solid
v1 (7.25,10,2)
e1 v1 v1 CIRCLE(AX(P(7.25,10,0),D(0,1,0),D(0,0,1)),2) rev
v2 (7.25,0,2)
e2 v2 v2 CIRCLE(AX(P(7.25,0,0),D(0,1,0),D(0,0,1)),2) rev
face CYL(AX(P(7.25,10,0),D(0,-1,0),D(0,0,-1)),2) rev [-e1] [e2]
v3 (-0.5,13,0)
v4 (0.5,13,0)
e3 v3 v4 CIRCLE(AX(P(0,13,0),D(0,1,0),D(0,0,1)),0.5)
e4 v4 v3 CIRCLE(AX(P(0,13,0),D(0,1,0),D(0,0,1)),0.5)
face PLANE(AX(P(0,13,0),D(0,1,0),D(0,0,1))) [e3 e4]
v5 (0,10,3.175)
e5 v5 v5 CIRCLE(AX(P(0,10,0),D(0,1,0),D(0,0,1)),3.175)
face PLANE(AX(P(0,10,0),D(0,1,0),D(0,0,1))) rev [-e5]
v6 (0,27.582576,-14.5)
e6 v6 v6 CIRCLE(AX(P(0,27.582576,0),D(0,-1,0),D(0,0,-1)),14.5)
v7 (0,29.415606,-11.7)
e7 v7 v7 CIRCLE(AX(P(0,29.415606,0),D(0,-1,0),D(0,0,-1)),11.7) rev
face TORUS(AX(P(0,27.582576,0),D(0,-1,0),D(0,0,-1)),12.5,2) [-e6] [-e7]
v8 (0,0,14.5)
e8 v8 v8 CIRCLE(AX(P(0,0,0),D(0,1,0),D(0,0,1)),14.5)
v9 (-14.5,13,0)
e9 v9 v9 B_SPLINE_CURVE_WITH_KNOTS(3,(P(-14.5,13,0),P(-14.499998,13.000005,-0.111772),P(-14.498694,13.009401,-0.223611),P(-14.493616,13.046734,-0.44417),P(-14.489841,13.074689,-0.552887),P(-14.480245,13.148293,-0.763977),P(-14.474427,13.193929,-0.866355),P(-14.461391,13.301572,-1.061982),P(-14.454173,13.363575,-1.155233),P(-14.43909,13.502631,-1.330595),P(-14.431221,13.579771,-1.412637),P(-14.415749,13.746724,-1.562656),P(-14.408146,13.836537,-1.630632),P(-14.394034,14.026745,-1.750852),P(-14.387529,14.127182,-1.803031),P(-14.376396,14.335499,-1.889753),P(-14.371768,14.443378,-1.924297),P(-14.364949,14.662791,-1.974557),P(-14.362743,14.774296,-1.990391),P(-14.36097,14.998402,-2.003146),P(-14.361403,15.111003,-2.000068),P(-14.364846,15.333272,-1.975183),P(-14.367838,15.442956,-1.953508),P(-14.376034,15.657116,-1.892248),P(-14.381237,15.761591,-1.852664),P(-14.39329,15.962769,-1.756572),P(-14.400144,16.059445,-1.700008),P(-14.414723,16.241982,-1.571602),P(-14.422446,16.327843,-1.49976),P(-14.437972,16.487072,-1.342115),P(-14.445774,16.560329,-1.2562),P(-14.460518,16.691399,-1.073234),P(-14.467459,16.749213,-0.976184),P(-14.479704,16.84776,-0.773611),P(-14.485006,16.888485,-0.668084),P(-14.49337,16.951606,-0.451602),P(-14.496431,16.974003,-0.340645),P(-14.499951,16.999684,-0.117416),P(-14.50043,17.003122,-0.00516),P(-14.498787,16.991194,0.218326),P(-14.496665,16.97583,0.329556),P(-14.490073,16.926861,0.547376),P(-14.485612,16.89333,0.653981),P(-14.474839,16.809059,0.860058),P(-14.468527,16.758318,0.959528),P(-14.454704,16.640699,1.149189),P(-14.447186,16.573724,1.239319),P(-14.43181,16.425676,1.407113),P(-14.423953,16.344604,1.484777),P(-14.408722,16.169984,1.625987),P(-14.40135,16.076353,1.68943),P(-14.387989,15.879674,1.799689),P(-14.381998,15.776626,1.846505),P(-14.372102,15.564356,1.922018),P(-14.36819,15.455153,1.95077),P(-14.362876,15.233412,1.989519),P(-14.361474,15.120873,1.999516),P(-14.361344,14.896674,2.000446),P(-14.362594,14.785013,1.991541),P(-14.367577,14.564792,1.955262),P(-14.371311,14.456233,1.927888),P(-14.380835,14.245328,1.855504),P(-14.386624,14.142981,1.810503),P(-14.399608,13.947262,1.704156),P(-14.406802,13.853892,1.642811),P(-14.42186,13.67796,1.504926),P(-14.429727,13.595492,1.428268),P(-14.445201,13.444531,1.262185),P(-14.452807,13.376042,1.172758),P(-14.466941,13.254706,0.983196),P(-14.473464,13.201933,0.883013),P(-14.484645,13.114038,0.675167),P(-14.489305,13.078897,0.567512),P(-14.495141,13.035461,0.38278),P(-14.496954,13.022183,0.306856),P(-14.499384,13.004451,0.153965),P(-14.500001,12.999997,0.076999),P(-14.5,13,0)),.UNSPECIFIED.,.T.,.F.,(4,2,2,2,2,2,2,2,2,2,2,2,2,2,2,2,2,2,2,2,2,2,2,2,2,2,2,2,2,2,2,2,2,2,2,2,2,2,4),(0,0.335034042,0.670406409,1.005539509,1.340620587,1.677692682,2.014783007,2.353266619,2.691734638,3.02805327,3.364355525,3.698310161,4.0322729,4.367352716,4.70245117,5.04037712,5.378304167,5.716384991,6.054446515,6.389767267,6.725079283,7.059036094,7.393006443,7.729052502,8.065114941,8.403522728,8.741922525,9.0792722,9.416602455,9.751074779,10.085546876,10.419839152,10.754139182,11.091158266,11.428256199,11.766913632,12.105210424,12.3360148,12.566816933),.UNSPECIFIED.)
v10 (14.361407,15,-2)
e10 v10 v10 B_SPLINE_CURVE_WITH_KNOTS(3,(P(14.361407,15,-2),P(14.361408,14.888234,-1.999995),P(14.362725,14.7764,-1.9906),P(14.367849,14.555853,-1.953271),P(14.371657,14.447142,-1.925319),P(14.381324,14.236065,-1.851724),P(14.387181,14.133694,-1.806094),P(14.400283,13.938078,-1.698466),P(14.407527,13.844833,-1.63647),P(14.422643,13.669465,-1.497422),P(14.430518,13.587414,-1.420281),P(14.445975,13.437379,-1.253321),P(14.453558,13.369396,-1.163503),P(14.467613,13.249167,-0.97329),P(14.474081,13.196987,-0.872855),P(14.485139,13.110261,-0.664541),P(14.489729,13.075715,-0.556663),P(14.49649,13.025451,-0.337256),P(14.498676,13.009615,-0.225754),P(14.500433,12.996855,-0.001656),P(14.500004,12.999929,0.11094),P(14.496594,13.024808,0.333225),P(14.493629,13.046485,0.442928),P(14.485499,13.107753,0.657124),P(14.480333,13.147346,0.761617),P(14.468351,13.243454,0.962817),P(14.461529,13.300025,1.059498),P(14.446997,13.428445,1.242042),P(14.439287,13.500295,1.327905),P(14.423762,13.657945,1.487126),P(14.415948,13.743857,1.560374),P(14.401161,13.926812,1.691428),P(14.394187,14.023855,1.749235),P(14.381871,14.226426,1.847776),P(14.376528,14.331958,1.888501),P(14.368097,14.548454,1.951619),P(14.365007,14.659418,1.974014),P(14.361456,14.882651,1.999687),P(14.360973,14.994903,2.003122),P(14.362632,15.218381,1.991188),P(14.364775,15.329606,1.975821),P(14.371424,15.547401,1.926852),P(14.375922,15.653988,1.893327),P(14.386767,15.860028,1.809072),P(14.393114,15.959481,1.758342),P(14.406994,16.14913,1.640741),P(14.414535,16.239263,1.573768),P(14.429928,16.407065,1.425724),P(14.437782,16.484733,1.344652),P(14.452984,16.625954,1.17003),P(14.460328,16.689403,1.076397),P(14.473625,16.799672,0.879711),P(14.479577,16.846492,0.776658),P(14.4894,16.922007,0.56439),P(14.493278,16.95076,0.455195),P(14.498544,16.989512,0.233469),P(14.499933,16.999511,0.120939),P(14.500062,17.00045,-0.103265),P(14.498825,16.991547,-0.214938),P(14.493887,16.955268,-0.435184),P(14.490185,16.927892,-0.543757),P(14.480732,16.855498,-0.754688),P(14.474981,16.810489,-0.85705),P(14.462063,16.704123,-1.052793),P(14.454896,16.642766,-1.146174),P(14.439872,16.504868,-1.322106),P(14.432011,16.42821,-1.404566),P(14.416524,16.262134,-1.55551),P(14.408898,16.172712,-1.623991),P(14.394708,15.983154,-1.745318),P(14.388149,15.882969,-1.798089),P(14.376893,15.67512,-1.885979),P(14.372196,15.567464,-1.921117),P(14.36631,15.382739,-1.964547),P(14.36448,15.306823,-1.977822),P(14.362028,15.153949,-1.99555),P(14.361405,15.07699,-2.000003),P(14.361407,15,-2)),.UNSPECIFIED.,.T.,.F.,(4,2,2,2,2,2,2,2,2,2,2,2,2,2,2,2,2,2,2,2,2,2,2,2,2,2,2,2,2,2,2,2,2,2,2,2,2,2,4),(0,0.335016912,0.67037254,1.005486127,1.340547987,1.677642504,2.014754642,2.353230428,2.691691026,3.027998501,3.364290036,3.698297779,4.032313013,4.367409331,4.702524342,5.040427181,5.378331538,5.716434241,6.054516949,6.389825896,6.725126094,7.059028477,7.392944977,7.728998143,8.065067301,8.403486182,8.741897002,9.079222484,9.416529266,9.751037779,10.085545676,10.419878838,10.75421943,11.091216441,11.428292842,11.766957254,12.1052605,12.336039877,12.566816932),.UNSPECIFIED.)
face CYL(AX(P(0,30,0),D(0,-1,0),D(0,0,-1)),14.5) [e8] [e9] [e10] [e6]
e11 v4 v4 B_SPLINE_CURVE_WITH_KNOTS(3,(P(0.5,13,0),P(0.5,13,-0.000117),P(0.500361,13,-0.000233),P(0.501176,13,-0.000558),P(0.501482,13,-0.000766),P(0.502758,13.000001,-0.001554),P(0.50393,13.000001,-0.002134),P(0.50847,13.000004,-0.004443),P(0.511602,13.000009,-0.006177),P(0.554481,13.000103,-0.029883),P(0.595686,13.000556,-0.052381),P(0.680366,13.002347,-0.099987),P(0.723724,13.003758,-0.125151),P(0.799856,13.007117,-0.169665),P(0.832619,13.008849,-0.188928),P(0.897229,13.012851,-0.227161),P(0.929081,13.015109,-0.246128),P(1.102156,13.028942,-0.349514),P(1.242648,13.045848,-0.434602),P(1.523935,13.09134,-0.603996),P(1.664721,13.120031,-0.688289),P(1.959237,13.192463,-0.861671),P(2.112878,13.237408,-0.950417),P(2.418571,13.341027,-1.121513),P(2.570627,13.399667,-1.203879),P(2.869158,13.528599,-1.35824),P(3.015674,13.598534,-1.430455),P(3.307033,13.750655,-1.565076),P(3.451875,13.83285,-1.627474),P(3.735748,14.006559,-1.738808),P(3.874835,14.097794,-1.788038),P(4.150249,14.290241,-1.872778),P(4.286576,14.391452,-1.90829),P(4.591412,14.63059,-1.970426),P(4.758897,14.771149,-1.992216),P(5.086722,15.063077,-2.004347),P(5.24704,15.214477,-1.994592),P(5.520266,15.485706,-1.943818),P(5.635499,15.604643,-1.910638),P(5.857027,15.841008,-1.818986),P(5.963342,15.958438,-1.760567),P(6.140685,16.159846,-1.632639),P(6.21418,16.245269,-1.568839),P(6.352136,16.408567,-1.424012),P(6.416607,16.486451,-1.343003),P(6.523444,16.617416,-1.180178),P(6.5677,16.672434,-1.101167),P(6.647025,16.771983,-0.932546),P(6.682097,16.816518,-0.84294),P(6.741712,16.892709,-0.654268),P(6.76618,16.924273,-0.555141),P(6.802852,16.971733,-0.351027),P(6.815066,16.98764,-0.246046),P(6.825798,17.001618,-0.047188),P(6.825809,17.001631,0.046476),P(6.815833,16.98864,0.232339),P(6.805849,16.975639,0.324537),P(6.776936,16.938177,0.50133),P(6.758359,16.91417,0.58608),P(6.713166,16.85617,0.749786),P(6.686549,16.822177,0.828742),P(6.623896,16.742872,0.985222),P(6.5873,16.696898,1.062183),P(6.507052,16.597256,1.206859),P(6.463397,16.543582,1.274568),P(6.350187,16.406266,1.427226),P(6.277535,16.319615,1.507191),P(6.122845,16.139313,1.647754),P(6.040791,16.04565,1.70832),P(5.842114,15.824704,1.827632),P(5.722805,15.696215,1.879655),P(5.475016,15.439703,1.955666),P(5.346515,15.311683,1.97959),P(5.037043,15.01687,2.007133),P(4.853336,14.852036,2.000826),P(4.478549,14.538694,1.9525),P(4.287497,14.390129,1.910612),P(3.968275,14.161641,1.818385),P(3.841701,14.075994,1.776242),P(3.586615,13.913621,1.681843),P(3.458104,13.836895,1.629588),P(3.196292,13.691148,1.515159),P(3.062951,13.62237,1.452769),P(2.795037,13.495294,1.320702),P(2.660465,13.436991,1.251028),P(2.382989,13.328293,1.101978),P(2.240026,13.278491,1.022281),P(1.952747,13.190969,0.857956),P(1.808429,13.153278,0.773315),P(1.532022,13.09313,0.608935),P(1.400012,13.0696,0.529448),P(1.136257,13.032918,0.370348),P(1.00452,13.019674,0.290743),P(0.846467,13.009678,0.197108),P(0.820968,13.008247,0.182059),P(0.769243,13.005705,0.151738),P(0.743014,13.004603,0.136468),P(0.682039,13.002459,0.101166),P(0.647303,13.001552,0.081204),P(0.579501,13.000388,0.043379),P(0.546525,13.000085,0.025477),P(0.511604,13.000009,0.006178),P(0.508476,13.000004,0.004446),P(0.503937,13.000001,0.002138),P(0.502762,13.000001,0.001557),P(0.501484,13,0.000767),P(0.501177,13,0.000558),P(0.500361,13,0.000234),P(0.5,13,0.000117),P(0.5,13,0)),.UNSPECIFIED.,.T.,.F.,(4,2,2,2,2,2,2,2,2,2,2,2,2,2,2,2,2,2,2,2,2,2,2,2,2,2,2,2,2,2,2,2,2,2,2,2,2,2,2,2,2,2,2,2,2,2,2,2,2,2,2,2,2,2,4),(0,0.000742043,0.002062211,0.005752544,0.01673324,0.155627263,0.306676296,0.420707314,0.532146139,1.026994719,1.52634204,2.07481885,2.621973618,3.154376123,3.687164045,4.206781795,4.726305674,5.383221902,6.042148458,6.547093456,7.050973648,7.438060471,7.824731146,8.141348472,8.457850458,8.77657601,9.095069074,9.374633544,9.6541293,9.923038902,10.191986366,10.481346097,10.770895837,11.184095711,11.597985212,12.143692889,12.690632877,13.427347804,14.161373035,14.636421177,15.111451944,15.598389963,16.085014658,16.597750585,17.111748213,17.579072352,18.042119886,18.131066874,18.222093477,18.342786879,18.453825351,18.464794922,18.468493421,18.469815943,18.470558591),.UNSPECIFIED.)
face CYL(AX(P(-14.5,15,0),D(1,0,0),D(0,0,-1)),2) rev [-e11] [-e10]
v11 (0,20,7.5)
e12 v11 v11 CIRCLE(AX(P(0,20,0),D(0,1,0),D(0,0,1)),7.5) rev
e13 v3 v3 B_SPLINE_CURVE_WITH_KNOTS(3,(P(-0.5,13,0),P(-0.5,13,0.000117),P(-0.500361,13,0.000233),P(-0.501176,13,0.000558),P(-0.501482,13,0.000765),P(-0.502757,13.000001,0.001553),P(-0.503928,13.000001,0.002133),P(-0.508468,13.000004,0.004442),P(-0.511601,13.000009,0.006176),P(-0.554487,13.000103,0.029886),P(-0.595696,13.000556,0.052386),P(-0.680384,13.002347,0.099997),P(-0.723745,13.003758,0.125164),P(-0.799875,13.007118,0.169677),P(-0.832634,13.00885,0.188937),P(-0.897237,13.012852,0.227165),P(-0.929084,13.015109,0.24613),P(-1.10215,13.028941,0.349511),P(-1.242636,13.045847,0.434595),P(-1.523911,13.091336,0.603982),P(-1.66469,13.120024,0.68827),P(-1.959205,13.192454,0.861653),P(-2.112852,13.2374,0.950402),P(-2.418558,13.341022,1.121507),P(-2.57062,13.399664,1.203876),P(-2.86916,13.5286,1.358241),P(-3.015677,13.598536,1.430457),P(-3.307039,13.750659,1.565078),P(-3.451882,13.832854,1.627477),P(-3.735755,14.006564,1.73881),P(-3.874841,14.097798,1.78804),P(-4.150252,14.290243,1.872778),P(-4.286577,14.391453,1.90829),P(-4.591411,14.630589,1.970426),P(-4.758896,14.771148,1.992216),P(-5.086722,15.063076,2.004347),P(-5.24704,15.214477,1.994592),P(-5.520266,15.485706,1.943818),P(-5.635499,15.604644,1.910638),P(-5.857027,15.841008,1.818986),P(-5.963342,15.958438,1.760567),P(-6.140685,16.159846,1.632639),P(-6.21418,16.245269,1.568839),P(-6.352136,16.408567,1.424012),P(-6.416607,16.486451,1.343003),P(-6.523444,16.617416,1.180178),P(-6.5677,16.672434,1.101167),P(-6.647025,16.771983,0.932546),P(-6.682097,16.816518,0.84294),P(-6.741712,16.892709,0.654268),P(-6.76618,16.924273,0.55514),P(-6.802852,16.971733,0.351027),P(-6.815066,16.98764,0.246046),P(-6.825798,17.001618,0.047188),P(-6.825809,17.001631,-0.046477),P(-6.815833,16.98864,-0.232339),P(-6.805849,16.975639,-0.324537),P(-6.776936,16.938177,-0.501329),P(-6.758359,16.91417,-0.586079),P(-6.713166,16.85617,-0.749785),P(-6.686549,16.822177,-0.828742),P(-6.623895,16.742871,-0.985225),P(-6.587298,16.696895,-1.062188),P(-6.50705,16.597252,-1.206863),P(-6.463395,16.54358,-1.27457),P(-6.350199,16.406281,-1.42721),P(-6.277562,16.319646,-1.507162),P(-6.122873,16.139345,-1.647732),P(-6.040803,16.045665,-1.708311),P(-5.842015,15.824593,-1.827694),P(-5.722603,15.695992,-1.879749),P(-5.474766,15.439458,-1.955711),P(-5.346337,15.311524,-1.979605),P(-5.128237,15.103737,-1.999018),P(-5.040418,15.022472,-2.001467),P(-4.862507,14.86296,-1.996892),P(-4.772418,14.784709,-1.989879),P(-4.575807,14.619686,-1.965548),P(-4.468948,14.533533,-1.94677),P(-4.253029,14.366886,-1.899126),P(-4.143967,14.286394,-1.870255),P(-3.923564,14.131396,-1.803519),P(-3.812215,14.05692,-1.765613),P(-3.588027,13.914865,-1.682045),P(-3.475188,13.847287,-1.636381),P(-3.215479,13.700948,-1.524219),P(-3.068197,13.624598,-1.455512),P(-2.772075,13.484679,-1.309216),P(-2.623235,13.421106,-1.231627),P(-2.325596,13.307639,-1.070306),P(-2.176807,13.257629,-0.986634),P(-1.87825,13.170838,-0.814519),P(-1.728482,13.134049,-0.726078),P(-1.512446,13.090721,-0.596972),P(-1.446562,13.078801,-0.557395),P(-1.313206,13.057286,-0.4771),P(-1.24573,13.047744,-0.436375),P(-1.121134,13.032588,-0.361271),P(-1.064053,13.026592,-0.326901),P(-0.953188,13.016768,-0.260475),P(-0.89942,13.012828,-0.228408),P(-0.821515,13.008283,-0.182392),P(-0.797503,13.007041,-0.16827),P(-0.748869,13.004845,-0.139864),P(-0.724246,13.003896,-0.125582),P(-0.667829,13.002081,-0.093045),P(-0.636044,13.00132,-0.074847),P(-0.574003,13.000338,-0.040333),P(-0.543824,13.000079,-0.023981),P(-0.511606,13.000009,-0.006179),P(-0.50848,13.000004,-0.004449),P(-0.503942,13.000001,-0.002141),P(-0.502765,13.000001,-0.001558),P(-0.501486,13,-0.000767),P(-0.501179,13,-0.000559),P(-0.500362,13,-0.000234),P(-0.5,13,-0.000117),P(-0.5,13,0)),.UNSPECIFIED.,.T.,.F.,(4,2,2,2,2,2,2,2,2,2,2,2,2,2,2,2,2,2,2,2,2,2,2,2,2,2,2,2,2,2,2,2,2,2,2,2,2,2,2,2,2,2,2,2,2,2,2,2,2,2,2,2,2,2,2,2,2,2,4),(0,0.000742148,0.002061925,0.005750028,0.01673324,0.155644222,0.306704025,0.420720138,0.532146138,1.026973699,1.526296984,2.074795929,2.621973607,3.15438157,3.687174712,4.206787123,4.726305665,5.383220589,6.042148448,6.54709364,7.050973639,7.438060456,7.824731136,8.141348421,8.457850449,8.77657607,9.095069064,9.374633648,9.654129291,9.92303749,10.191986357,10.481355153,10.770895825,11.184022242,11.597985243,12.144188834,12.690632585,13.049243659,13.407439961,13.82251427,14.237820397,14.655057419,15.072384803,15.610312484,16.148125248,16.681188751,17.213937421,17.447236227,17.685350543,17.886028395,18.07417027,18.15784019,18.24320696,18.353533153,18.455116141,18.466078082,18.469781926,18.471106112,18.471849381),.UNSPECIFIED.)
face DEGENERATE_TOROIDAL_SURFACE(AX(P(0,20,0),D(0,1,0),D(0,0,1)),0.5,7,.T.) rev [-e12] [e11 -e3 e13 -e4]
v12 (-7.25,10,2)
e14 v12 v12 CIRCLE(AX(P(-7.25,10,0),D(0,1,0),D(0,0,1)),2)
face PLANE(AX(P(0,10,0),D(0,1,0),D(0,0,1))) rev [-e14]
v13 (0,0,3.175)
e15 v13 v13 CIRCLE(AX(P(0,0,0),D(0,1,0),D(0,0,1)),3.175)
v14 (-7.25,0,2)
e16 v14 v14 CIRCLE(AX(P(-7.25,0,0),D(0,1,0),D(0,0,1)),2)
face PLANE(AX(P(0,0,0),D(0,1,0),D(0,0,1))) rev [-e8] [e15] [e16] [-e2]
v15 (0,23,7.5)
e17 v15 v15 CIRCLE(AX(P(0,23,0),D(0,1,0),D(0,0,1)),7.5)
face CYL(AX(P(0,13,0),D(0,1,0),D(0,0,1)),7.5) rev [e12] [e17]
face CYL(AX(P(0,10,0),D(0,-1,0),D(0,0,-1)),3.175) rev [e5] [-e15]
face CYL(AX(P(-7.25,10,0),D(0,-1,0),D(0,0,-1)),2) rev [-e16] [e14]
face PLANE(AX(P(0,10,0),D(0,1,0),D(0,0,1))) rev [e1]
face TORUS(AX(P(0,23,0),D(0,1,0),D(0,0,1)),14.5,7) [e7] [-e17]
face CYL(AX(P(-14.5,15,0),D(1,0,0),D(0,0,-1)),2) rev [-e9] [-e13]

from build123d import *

# Parameters (mm, degrees)
ESBO_O1_R                  = 14.5
RESSALTO_EXTRUS_O1_DEPTH   = 30
ESBO_O3_R                  = 7.5
CORTE_EXTRUS_O3_DEPTH      = 17
FILETE1_R                  = 7
FILETE2_R                  = 2
CORTE_EXTRUS_O1_DEPTH      = 36.994872408
CORTE_EXTRUS_O1_DEPTH_BACK = 36.994872408
ESBO_O2_R                  = 2
ESBO_O1_3_R                = 2
CORTE_EXTRUS_O2_DEPTH      = 10


with BuildPart() as part:
    # Esboço1 → Ressalto-extrusão1 (new body)
    with BuildSketch(Plane(origin=(0, 0, 0), x_dir=(1, 0, 0), z_dir=(0, 1, 0))):
        with Locations(Location((0, 0, 0), (0, 0, 270))):
            Circle(ESBO_O1_R)
    extrude(amount=RESSALTO_EXTRUS_O1_DEPTH)

    # Esboço3 → Corte-extrusão3 (cut)
    with BuildSketch(Plane(origin=(0, 30, 0), x_dir=(1, 0, 0), z_dir=(0, 1, 0))):
        with Locations(Location((0, 0, 0), (0, 0, 270))):
            Circle(ESBO_O3_R)
    extrude(amount=-CORTE_EXTRUS_O3_DEPTH, mode=Mode.SUBTRACT)

    # Filete1
    filete1_edges = [part.edges().sort_by_distance(p)[0] for p in [
        (0, 13, -7.5),
        (0, 30, -7.5),
    ]]
    fillet(filete1_edges, radius=FILETE1_R - 0.0001)  # a hair under: the kernel refuses the full size

    # Filete2
    filete2_edges = [part.edges().sort_by_distance(p)[0] for p in [
        (0, 30, -14.5),
    ]]
    fillet(filete2_edges, radius=FILETE2_R)

    # Esboço2 → Corte-extrusão1 (cut, two sides: drawn at the far end of the back side and taken through both)
    with BuildSketch(Plane(origin=(0, 0, 0), x_dir=(0, 0, -1), z_dir=(1, 0, 0)).offset(-CORTE_EXTRUS_O1_DEPTH_BACK)):
        with Locations((0, 15)):
            Circle(ESBO_O2_R)
    extrude(amount=CORTE_EXTRUS_O1_DEPTH + CORTE_EXTRUS_O1_DEPTH_BACK, mode=Mode.SUBTRACT)

    # Esboço1<3> → Corte-extrusão2 (cut)
    with BuildSketch(Plane(origin=(0, 0, 0), x_dir=(1, 0, 0), z_dir=(0, 1, 0))):
        with Locations(Location((-7.25, 0, 0), (0, 0, 270))):
            Circle(ESBO_O1_3_R)
        with BuildLine():
            ThreePointArc((3.175, 0), (2.24506403, 2.24506403), (0, 3.175))
            Line((0, 3.175), (0, -3.175))
            ThreePointArc((0, -3.175), (2.24506403, -2.24506403), (3.175, 0))
        make_face()
        with BuildLine():
            Line((0, -3.175), (0, 3.175))
            ThreePointArc((0, 3.175), (-3.175, 0), (0, -3.175))
        make_face()
        with Locations(Location((7.25, 0, 0), (0, 0, 270))):
            Circle(ESBO_O1_3_R)
    extrude(amount=CORTE_EXTRUS_O2_DEPTH, mode=Mode.SUBTRACT)


solid = part.part
